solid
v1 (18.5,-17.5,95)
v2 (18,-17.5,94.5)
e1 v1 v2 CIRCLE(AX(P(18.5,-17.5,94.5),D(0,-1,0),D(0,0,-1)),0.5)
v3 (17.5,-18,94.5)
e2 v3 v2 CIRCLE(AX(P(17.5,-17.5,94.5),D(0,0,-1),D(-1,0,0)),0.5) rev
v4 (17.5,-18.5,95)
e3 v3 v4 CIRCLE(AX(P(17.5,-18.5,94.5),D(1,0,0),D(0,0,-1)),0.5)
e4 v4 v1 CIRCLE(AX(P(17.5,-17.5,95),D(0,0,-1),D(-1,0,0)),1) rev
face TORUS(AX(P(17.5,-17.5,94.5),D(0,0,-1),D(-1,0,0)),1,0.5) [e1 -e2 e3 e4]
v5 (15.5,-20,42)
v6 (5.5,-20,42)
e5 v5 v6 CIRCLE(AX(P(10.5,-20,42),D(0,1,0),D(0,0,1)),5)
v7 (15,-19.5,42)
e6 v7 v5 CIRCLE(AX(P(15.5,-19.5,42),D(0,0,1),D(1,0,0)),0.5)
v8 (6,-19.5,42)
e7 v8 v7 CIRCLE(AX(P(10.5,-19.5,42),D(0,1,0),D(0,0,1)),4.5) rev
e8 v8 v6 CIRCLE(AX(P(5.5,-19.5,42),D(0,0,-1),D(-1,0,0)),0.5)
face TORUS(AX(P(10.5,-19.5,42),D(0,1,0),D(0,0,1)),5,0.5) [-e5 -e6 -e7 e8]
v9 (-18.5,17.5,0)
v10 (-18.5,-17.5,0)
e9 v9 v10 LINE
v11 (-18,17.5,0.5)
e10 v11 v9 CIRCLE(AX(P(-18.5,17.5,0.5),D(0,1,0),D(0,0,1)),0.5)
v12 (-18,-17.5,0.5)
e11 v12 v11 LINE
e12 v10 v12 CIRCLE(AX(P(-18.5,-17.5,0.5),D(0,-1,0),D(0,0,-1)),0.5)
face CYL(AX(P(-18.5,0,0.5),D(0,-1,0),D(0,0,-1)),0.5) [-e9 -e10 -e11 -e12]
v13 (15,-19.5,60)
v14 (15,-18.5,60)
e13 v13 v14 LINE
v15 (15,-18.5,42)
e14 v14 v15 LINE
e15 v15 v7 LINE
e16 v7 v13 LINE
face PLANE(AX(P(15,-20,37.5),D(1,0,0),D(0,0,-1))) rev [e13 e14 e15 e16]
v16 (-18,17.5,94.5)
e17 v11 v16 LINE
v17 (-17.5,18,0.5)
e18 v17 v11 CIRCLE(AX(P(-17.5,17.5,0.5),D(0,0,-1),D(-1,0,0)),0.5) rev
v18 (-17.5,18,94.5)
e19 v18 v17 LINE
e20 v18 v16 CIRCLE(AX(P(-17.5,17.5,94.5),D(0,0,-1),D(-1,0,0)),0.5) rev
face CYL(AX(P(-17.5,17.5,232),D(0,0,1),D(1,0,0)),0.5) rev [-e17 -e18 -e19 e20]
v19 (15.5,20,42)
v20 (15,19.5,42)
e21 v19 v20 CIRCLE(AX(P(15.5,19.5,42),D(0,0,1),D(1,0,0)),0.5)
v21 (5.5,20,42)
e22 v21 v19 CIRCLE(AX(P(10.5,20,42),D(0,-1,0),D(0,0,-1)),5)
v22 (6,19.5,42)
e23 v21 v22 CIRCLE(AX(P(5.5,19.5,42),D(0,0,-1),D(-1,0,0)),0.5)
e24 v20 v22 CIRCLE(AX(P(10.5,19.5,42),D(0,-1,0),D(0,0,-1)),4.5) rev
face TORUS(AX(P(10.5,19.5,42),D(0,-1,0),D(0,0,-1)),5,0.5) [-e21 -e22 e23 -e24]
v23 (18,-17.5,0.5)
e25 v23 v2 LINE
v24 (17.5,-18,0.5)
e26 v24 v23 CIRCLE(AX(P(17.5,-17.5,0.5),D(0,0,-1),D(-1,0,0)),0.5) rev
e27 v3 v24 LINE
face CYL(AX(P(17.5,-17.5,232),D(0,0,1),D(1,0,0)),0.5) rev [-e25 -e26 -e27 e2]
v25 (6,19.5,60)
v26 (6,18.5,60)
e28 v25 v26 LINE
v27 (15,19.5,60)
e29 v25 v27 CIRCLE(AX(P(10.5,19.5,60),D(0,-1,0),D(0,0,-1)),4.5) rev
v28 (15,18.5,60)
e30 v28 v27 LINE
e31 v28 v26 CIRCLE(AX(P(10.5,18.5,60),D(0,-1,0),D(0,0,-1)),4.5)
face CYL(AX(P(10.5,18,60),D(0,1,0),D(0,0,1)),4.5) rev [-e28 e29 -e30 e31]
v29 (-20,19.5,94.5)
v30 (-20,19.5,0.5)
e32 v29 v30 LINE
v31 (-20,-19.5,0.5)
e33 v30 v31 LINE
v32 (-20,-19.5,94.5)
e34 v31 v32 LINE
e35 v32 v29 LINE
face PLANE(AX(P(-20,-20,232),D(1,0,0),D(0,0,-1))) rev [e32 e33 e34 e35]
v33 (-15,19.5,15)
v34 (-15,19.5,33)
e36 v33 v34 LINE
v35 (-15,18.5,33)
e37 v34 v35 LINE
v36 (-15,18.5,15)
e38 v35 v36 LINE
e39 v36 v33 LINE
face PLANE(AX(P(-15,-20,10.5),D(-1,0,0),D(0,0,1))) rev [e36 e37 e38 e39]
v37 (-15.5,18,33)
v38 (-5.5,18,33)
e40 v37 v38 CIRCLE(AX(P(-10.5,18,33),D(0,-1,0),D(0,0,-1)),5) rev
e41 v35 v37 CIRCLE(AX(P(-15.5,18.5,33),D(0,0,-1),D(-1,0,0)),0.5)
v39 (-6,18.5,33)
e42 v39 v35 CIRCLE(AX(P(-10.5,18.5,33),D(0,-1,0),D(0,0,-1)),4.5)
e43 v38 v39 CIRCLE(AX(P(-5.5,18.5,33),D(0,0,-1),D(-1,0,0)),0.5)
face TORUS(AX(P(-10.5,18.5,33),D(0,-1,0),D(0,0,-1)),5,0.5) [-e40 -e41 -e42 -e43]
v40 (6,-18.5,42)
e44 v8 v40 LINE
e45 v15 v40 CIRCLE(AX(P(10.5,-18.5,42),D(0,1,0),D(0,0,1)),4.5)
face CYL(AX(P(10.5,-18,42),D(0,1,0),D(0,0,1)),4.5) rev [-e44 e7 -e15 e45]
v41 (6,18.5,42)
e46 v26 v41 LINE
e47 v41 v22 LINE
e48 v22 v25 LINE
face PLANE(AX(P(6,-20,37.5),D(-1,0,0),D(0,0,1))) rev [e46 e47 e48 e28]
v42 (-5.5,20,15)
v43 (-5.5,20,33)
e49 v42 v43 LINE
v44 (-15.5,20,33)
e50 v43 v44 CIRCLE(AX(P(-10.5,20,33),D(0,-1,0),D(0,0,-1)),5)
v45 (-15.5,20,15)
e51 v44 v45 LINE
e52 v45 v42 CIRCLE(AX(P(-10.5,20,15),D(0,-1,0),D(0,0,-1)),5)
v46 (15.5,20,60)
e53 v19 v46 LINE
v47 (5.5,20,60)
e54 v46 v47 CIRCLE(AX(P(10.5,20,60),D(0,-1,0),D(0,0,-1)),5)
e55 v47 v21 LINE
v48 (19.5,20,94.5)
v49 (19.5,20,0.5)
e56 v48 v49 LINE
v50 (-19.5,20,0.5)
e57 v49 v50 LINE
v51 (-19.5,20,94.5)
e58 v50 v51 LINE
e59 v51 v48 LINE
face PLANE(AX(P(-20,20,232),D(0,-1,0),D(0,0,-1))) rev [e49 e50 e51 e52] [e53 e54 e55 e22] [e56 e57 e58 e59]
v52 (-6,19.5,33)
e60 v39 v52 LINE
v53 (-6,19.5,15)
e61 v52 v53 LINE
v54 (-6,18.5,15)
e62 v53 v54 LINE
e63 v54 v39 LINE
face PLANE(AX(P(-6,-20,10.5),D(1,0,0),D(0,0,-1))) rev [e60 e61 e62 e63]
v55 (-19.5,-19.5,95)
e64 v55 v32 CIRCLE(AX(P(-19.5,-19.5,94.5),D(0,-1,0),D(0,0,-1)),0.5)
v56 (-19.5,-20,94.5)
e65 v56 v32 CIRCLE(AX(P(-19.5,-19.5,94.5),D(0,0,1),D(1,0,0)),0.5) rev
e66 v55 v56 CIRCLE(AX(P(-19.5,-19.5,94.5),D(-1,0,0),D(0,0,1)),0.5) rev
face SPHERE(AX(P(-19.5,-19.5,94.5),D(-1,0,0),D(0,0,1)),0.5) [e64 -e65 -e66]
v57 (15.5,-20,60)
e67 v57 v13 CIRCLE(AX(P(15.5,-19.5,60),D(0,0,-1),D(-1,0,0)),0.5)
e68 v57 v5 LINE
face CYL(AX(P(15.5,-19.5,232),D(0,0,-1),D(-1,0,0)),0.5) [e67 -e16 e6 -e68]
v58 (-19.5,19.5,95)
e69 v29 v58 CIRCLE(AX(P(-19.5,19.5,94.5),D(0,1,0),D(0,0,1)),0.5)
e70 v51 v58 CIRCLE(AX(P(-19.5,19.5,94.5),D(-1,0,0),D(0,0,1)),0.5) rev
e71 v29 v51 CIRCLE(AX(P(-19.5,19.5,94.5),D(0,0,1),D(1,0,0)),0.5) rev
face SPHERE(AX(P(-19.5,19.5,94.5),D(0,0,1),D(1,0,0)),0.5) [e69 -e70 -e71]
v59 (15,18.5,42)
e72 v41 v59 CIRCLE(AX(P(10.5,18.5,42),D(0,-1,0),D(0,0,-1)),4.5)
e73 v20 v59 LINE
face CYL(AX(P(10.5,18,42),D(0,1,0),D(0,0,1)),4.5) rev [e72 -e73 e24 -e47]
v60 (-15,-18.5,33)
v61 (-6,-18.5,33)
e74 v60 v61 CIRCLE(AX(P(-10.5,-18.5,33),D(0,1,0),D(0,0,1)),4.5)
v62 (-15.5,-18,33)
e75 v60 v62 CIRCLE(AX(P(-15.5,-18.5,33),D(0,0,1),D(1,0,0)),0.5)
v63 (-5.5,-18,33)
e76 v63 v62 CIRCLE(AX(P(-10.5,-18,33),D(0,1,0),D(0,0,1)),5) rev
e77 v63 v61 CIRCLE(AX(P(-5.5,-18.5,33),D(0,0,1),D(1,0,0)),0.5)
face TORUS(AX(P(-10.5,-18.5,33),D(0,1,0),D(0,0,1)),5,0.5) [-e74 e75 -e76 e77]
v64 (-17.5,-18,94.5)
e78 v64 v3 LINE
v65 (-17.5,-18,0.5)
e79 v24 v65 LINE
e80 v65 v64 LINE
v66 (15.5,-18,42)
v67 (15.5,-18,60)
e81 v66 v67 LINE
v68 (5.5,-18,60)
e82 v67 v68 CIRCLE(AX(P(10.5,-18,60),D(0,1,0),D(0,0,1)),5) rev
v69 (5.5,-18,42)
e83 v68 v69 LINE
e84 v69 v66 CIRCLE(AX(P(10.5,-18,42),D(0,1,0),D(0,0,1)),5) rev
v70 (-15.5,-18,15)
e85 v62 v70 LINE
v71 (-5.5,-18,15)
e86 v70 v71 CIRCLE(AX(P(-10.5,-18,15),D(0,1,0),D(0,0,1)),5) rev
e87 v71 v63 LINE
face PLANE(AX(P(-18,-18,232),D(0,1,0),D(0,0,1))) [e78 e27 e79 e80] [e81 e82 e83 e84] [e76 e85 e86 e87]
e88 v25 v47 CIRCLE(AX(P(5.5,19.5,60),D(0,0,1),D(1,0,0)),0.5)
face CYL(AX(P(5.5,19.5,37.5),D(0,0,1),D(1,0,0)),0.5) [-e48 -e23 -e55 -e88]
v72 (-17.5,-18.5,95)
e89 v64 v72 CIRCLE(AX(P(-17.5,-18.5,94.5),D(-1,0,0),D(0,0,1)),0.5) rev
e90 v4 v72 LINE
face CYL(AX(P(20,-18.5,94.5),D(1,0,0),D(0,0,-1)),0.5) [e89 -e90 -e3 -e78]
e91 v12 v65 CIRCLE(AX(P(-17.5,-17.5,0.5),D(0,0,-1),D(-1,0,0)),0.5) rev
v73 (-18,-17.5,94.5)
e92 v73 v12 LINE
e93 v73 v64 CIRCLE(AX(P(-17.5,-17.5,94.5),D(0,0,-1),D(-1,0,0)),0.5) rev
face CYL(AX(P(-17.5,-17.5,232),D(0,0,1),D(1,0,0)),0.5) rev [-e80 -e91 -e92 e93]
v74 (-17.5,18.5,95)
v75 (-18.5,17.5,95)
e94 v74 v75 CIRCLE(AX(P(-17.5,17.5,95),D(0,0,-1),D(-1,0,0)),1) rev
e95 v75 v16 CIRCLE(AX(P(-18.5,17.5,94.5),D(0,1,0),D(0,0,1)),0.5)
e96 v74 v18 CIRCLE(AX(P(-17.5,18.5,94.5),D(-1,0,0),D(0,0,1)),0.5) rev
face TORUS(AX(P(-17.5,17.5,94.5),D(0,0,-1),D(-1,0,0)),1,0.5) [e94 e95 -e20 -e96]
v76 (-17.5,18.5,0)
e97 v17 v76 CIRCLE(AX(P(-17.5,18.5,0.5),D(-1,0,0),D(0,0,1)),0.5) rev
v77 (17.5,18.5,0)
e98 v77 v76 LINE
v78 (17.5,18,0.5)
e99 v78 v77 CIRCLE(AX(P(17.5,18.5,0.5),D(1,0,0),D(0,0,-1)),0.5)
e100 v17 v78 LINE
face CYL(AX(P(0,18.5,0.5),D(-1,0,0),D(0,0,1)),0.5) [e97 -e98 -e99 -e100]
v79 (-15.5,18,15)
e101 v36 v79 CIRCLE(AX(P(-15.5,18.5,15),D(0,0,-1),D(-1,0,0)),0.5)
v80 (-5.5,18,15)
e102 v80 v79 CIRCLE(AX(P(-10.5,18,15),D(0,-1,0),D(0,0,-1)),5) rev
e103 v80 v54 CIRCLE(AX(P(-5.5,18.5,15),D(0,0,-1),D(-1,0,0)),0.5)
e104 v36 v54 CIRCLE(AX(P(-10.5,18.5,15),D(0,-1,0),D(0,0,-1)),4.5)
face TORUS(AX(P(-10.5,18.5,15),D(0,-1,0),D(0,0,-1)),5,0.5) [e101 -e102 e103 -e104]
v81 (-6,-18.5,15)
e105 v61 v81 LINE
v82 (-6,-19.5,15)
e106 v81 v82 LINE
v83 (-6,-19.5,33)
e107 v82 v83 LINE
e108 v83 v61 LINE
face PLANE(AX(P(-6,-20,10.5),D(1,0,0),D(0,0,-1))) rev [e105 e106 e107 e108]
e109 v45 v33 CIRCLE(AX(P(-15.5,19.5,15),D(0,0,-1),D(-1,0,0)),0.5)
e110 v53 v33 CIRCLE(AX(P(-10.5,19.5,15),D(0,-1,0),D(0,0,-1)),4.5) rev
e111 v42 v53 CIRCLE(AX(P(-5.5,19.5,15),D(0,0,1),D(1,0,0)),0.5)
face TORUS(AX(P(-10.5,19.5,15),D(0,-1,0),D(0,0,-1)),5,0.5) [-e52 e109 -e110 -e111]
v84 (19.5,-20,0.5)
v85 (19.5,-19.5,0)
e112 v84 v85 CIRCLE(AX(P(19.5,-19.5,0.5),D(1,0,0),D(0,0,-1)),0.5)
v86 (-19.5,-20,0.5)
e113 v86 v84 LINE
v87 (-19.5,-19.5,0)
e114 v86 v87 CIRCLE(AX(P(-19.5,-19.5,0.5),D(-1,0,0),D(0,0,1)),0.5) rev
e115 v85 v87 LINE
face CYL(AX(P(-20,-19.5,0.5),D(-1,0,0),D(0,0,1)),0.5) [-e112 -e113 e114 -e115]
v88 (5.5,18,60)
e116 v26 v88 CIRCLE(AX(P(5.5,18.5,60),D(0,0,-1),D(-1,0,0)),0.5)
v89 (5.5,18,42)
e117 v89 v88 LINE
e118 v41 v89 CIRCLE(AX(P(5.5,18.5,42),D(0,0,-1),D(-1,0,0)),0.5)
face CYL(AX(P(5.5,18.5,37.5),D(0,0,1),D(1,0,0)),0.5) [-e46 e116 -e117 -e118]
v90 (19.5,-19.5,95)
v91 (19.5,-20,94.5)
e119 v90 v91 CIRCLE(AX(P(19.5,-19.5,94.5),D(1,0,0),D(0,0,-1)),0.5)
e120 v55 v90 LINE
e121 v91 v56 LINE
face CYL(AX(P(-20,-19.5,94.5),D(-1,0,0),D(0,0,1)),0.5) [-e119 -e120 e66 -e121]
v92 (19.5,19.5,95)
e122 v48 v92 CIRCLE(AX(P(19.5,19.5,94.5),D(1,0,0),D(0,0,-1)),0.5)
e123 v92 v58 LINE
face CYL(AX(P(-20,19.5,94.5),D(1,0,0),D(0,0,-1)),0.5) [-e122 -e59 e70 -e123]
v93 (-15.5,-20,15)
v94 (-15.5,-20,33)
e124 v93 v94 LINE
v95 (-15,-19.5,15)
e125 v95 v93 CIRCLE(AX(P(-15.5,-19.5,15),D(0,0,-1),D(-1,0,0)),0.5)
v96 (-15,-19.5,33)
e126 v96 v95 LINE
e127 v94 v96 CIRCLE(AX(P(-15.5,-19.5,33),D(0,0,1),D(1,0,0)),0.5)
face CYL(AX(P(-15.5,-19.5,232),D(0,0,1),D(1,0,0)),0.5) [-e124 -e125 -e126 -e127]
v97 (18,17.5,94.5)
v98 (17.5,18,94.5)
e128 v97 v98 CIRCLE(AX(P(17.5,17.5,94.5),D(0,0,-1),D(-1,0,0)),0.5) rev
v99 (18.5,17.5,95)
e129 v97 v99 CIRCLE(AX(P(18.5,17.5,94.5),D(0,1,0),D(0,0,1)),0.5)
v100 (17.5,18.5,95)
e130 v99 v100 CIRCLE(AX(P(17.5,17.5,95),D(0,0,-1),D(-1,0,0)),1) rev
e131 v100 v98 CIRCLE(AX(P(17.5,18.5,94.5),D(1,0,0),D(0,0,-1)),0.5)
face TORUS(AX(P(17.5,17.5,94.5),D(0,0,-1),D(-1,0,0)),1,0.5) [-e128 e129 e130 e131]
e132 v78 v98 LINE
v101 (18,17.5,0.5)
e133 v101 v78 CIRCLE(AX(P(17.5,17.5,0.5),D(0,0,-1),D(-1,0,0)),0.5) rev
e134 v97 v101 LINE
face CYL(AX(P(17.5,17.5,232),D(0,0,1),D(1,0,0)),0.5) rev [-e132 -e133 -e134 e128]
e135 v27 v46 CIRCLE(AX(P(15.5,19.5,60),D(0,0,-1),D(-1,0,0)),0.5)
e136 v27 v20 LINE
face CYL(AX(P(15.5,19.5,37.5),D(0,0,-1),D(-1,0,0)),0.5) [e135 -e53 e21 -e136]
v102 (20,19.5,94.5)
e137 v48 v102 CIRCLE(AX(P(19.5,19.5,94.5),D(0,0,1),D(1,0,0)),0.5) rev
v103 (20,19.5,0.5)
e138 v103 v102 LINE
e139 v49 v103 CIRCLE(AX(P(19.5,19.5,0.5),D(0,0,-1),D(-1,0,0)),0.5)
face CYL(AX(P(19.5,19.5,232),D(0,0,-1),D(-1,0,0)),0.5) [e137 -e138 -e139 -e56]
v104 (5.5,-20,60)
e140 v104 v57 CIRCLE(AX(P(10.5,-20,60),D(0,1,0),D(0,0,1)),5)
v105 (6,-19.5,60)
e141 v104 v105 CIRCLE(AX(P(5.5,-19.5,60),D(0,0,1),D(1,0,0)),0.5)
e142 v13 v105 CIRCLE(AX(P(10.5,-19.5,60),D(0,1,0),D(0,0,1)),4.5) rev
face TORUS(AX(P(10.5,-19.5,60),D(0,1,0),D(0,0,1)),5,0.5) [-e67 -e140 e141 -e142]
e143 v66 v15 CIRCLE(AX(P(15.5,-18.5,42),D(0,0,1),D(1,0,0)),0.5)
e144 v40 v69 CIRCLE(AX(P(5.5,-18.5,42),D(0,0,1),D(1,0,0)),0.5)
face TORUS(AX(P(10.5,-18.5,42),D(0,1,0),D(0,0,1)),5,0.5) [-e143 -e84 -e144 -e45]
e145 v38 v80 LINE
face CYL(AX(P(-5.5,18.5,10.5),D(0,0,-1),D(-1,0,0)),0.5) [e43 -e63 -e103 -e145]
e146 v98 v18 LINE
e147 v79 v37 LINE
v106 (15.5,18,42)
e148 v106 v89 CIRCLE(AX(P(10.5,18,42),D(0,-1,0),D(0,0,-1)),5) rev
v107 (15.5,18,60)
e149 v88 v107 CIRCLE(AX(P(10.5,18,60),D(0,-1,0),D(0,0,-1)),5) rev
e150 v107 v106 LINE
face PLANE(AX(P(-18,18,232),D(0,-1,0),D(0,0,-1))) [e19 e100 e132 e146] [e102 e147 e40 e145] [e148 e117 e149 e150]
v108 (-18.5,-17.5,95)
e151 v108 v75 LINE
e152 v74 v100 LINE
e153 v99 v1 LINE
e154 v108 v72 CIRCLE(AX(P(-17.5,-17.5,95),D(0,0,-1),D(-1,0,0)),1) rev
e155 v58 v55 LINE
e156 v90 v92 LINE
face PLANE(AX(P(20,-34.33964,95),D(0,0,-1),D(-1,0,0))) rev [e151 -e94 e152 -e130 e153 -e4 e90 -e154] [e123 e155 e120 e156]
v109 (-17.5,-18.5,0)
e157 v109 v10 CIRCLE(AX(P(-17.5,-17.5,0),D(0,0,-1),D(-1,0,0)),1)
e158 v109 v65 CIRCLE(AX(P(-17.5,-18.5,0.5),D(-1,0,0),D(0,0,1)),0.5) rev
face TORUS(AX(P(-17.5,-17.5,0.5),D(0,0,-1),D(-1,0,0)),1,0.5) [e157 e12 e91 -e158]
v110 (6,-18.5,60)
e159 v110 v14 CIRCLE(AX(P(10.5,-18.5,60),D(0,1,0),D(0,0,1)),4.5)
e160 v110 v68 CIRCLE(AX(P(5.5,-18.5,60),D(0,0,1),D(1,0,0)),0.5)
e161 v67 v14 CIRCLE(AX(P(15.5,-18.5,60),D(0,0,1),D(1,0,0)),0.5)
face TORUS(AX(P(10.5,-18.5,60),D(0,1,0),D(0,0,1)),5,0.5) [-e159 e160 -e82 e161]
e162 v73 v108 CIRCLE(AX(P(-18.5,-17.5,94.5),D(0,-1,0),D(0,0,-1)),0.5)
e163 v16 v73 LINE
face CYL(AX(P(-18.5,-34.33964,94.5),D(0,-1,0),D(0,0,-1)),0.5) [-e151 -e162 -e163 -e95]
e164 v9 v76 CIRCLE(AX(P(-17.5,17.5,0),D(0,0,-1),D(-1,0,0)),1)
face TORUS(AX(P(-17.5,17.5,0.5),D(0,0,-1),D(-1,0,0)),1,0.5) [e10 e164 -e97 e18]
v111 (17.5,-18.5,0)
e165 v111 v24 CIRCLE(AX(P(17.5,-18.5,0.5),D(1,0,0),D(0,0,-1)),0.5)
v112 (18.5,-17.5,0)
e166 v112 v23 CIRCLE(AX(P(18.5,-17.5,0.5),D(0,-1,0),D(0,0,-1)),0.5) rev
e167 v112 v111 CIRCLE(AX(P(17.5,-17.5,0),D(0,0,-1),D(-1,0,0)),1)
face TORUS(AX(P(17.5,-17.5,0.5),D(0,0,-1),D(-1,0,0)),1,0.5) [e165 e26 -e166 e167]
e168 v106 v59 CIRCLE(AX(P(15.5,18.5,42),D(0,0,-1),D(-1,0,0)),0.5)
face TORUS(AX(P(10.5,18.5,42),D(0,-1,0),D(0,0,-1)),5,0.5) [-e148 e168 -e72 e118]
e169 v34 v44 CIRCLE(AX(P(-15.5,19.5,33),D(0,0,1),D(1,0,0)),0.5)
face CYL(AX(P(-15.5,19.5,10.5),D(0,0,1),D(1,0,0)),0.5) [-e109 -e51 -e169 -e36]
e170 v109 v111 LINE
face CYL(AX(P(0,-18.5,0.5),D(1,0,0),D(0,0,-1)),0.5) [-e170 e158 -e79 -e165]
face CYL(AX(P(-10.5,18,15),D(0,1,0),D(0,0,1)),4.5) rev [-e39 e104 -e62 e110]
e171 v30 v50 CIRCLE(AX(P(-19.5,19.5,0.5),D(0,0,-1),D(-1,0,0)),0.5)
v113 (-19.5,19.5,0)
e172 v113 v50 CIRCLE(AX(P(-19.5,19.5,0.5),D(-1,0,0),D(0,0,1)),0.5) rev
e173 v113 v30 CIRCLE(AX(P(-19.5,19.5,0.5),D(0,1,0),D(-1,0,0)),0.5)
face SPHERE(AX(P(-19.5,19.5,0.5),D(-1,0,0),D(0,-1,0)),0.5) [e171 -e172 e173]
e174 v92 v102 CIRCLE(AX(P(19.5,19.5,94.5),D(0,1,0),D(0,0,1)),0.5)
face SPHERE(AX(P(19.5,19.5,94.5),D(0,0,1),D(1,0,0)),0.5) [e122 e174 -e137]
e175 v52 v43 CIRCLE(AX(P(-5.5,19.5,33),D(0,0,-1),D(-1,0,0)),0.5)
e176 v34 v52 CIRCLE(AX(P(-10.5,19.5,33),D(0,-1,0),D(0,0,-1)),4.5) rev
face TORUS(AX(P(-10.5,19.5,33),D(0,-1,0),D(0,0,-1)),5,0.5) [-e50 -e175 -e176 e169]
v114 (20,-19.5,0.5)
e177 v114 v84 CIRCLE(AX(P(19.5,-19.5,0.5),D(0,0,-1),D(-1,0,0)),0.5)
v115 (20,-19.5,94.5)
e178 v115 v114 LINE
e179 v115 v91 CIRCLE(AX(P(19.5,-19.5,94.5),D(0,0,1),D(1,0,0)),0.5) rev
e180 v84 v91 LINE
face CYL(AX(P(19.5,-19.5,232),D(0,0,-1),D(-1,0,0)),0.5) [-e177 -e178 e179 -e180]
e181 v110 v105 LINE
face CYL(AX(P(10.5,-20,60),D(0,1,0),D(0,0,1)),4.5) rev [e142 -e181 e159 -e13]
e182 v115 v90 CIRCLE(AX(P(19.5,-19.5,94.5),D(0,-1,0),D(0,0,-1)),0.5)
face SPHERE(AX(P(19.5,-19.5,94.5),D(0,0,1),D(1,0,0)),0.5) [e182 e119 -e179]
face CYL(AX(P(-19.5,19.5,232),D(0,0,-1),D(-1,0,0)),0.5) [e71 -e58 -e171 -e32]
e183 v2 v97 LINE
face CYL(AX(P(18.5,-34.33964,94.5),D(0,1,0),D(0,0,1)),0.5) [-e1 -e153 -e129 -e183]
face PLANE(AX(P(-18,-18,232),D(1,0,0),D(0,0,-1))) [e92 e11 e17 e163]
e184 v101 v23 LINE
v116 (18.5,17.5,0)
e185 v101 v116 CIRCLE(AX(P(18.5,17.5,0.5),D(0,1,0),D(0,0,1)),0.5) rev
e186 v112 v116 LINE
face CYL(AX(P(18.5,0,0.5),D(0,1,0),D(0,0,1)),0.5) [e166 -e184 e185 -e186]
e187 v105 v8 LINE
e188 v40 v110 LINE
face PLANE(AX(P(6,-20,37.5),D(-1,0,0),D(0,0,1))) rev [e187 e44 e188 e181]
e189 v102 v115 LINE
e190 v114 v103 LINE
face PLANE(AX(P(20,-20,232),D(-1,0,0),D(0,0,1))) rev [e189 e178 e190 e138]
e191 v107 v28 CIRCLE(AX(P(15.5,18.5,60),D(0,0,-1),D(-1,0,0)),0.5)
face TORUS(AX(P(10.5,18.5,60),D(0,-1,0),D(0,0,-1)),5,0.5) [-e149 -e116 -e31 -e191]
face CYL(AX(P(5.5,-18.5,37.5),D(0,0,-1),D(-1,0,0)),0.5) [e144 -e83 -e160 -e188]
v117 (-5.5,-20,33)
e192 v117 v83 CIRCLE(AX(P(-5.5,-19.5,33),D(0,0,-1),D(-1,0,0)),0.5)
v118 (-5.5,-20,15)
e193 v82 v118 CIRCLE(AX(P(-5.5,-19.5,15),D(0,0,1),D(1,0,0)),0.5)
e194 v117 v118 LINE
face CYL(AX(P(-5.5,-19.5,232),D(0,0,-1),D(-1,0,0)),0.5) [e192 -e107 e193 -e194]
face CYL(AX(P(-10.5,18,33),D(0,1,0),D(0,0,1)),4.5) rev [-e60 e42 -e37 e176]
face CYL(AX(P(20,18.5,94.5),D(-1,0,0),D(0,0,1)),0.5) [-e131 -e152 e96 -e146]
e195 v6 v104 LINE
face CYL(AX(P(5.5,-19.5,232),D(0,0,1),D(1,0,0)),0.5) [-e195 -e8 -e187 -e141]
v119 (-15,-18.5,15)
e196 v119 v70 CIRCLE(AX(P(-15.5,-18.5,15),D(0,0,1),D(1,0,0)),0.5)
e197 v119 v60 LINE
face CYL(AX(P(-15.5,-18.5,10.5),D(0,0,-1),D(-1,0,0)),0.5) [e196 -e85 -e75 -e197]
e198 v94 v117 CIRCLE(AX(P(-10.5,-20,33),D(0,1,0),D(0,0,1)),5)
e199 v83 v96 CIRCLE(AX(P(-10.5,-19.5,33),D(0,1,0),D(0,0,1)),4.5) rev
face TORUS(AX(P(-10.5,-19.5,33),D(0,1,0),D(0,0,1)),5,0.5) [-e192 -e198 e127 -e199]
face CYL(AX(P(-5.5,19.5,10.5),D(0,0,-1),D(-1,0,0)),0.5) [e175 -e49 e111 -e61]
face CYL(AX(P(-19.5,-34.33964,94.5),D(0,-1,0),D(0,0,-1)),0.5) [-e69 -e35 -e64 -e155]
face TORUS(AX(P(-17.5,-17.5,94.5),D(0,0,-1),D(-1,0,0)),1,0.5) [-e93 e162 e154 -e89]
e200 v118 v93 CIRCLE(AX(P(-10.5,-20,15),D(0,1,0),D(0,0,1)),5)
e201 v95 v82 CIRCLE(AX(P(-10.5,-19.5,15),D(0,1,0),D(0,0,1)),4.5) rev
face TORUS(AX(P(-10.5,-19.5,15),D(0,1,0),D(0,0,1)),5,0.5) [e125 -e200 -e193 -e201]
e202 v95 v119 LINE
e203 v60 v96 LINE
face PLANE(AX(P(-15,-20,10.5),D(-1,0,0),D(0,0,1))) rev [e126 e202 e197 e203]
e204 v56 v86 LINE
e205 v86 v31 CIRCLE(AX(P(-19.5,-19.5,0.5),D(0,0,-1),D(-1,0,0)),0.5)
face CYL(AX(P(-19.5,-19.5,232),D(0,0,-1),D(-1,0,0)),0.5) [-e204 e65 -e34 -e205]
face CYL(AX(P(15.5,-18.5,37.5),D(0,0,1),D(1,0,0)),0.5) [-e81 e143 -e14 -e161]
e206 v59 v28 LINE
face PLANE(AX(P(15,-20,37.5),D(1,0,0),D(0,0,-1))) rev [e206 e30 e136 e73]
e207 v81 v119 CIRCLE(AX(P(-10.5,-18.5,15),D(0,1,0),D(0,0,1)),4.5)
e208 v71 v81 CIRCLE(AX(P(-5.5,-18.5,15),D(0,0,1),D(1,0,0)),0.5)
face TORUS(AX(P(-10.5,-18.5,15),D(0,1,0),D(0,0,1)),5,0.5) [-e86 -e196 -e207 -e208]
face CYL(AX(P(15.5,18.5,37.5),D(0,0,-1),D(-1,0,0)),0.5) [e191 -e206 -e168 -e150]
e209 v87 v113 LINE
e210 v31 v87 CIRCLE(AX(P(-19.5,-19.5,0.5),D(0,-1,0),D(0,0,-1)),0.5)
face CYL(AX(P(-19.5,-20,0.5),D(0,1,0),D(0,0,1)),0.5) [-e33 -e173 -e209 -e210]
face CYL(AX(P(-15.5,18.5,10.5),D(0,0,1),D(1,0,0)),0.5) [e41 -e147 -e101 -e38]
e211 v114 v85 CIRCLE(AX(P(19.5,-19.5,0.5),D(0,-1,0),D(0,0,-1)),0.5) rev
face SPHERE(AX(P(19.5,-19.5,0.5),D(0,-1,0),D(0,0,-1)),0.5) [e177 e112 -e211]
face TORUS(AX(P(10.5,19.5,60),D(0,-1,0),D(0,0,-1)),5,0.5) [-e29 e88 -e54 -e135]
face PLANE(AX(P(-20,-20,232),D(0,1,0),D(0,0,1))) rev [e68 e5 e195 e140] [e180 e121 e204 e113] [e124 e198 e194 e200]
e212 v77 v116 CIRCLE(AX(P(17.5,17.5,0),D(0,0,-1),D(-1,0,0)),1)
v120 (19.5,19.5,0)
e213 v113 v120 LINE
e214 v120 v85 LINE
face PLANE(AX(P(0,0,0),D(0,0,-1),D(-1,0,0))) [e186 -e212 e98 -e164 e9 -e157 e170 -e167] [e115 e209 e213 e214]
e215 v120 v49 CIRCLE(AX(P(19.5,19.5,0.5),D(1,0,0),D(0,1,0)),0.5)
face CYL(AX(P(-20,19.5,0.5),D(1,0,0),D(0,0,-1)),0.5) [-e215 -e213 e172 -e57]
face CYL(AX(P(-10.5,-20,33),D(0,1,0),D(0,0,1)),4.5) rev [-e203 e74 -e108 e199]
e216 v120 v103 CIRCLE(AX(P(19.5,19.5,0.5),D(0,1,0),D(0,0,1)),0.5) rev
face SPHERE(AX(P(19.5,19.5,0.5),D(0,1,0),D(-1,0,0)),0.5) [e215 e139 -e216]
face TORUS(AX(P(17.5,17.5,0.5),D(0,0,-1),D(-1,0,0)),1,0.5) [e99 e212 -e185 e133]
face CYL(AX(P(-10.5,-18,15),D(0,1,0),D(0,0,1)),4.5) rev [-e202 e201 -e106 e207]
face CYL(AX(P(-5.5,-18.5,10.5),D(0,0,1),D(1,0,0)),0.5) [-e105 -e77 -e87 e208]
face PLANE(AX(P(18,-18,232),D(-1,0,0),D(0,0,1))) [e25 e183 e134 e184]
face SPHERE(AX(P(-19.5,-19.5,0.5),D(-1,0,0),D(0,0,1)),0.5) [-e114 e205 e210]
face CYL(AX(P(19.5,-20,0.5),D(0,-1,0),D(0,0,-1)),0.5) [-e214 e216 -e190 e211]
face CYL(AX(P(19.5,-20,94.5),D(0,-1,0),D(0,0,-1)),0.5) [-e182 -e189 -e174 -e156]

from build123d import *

# Parameters (mm, degrees)
SKIZZE1_W                       = 40
SKIZZE1_H                       = 40
SKIZZE1_W_2                     = 36
SKIZZE1_H_2                     = 36
AUFSATZ_LINEAR_AUSTRAGEN1_DEPTH = 232
SKIZZE4_W                       = 137
SKIZZE4_H                       = 61.891595387
SCHNITT_LINEAR_AUSTRAGEN2_DEPTH = 237.27103081
SKIZZE9_W                       = 9
SKIZZE9_H                       = 27
SCHNITT_LINEAR_AUSTRAGEN5_DEPTH = 106
VERRUNDUNG1_R                   = 4.5
VERRUNDUNG2_R                   = 4.5
VERRUNDUNG3_R                   = 4.5
VERRUNDUNG4_R                   = 4.5
SKIZZE10_W                      = 9
SKIZZE10_H                      = 27
SCHNITT_LINEAR_AUSTRAGEN6_DEPTH = 106
VERRUNDUNG5_R                   = 4.5
VERRUNDUNG6_R                   = 4.5
VERRUNDUNG7_R                   = 4.5
VERRUNDUNG8_R                   = 4.5
VERRUNDUNG9_R                   = 0.5


with BuildPart() as part:
    # Skizze1 → Aufsatz-Linear austragen1 (new body)
    with BuildSketch(Plane.XY):
        Rectangle(SKIZZE1_W, SKIZZE1_H)
        Rectangle(SKIZZE1_W_2, SKIZZE1_H_2, mode=Mode.SUBTRACT)
    extrude(amount=AUFSATZ_LINEAR_AUSTRAGEN1_DEPTH)

    # Skizze4 → Schnitt-Linear austragen2 (cut, through all)
    with BuildSketch(Plane.ZY.offset(20)):
        with Locations((163.5, -3.393842352)):
            Rectangle(SKIZZE4_W, SKIZZE4_H)
    extrude(amount=-SCHNITT_LINEAR_AUSTRAGEN2_DEPTH, mode=Mode.SUBTRACT)

    # Skizze9 → Schnitt-Linear austragen5 (cut, through all)
    with BuildSketch(Plane(origin=(0, 20, 0), x_dir=(1, 0, 0), z_dir=(0, 1, 0))):
        with Locations((10.5, -51)):
            Rectangle(SKIZZE9_W, SKIZZE9_H)
    extrude(amount=-SCHNITT_LINEAR_AUSTRAGEN5_DEPTH, mode=Mode.SUBTRACT)

    # Verrundung1
    verrundung1_edges = [part.edges().sort_by_distance(p)[0] for p in [
        (6, 19, 37.5),
        (15, 19, 37.5),
    ]]
    fillet(verrundung1_edges, radius=VERRUNDUNG1_R - 0.0001)  # a hair under: the kernel refuses the full size

    # Verrundung2
    verrundung2_edges = [part.edges().sort_by_distance(p)[0] for p in [
        (6, 19, 64.5),
        (15, 19, 64.5),
    ]]
    fillet(verrundung2_edges, radius=VERRUNDUNG2_R - 0.0001)  # a hair under: the kernel refuses the full size

    # Verrundung3
    verrundung3_edges = [part.edges().sort_by_distance(p)[0] for p in [
        (6, -19, 64.5),
        (15, -19, 64.5),
    ]]
    fillet(verrundung3_edges, radius=VERRUNDUNG3_R - 0.0001)  # a hair under: the kernel refuses the full size

    # Verrundung4
    verrundung4_edges = [part.edges().sort_by_distance(p)[0] for p in [
        (6, -19, 37.5),
        (15, -19, 37.5),
    ]]
    fillet(verrundung4_edges, radius=VERRUNDUNG4_R - 0.0001)  # a hair under: the kernel refuses the full size

    # Skizze10 → Schnitt-Linear austragen6 (cut, through all)
    with BuildSketch(Plane(origin=(0, 20, 0), x_dir=(1, 0, 0), z_dir=(0, 1, 0))):
        with Locations((-10.5, -24)):
            Rectangle(SKIZZE10_W, SKIZZE10_H)
    extrude(amount=-SCHNITT_LINEAR_AUSTRAGEN6_DEPTH, mode=Mode.SUBTRACT)

    # Verrundung5
    verrundung5_edges = [part.edges().sort_by_distance(p)[0] for p in [
        (-15, 19, 10.5),
        (-6, 19, 10.5),
    ]]
    fillet(verrundung5_edges, radius=VERRUNDUNG5_R - 0.0001)  # a hair under: the kernel refuses the full size

    # Verrundung6
    verrundung6_edges = [part.edges().sort_by_distance(p)[0] for p in [
        (-15, 19, 37.5),
        (-6, 19, 37.5),
    ]]
    fillet(verrundung6_edges, radius=VERRUNDUNG6_R - 0.0001)  # a hair under: the kernel refuses the full size

    # Verrundung7
    verrundung7_edges = [part.edges().sort_by_distance(p)[0] for p in [
        (-15, -19, 37.5),
        (-6, -19, 37.5),
    ]]
    fillet(verrundung7_edges, radius=VERRUNDUNG7_R - 0.0001)  # a hair under: the kernel refuses the full size

    # Verrundung8
    verrundung8_edges = [part.edges().sort_by_distance(p)[0] for p in [
        (-15, -19, 10.5),
        (-6, -19, 10.5),
    ]]
    fillet(verrundung8_edges, radius=VERRUNDUNG8_R - 0.0001)  # a hair under: the kernel refuses the full size

    # Verrundung9
    verrundung9_edges = [part.edges().sort_by_distance(p)[0] for p in [
        (10.5, 20, 37.5),
        (15, 20, 51),
        (6, 18, 51),
        (10.5, 18, 64.5),
        (10.5, 20, 64.5),
        (15, -18, 51),
        (15, -20, 51),
        (10.5, -20, 64.5),
        (10.5, -18, 64.5),
        (6, -18, 51),
        (6, -20, 51),
        (10.5, -18, 37.5),
        (10.5, -20, 37.5),
        (18, 0, 0),
        (0, 18, 0),
        (-18, 0, 0),
        (0, -18, 0),
        (-15, 20, 24),
        (-6, 18, 24),
        (-10.5, 18, 10.5),
        (-10.5, 20, 10.5),
        (-6, 20, 24),
        (-15, 18, 24),
        (-10.5, 18, 37.5),
        (-10.5, 20, 37.5),
        (-6, -18, 24),
        (-6, -20, 24),
        (-10.5, -20, 37.5),
        (-10.5, -18, 37.5),
        (-15, -18, 24),
        (-15, -20, 24),
        (-10.5, -18, 10.5),
        (-10.5, -20, 10.5),
        (-18, -18, 47.5),
        (18, -18, 47.5),
        (0, -18, 95),
        (-18, 18, 47.5),
        (18, 18, 47.5),
        (20, -20, 47.5),
        (-20, -20, 47.5),
        (-20, 20, 47.5),
        (20, 20, 47.5),
        (-20, 0, 95),
        (0, 20, 95),
        (20, 0, 95),
        (0, -20, 95),
        (0, 18, 95),
        (18, 0, 95),
        (-18, 0, 95),
        (0, -20, 0),
        (-20, 0, 0),
        (0, 20, 0),
        (20, 0, 0),
        (6, 20, 51),
        (15, 18, 51),
        (10.5, 18, 37.5),
    ]]
    fillet(verrundung9_edges, radius=VERRUNDUNG9_R)


solid = part.part
